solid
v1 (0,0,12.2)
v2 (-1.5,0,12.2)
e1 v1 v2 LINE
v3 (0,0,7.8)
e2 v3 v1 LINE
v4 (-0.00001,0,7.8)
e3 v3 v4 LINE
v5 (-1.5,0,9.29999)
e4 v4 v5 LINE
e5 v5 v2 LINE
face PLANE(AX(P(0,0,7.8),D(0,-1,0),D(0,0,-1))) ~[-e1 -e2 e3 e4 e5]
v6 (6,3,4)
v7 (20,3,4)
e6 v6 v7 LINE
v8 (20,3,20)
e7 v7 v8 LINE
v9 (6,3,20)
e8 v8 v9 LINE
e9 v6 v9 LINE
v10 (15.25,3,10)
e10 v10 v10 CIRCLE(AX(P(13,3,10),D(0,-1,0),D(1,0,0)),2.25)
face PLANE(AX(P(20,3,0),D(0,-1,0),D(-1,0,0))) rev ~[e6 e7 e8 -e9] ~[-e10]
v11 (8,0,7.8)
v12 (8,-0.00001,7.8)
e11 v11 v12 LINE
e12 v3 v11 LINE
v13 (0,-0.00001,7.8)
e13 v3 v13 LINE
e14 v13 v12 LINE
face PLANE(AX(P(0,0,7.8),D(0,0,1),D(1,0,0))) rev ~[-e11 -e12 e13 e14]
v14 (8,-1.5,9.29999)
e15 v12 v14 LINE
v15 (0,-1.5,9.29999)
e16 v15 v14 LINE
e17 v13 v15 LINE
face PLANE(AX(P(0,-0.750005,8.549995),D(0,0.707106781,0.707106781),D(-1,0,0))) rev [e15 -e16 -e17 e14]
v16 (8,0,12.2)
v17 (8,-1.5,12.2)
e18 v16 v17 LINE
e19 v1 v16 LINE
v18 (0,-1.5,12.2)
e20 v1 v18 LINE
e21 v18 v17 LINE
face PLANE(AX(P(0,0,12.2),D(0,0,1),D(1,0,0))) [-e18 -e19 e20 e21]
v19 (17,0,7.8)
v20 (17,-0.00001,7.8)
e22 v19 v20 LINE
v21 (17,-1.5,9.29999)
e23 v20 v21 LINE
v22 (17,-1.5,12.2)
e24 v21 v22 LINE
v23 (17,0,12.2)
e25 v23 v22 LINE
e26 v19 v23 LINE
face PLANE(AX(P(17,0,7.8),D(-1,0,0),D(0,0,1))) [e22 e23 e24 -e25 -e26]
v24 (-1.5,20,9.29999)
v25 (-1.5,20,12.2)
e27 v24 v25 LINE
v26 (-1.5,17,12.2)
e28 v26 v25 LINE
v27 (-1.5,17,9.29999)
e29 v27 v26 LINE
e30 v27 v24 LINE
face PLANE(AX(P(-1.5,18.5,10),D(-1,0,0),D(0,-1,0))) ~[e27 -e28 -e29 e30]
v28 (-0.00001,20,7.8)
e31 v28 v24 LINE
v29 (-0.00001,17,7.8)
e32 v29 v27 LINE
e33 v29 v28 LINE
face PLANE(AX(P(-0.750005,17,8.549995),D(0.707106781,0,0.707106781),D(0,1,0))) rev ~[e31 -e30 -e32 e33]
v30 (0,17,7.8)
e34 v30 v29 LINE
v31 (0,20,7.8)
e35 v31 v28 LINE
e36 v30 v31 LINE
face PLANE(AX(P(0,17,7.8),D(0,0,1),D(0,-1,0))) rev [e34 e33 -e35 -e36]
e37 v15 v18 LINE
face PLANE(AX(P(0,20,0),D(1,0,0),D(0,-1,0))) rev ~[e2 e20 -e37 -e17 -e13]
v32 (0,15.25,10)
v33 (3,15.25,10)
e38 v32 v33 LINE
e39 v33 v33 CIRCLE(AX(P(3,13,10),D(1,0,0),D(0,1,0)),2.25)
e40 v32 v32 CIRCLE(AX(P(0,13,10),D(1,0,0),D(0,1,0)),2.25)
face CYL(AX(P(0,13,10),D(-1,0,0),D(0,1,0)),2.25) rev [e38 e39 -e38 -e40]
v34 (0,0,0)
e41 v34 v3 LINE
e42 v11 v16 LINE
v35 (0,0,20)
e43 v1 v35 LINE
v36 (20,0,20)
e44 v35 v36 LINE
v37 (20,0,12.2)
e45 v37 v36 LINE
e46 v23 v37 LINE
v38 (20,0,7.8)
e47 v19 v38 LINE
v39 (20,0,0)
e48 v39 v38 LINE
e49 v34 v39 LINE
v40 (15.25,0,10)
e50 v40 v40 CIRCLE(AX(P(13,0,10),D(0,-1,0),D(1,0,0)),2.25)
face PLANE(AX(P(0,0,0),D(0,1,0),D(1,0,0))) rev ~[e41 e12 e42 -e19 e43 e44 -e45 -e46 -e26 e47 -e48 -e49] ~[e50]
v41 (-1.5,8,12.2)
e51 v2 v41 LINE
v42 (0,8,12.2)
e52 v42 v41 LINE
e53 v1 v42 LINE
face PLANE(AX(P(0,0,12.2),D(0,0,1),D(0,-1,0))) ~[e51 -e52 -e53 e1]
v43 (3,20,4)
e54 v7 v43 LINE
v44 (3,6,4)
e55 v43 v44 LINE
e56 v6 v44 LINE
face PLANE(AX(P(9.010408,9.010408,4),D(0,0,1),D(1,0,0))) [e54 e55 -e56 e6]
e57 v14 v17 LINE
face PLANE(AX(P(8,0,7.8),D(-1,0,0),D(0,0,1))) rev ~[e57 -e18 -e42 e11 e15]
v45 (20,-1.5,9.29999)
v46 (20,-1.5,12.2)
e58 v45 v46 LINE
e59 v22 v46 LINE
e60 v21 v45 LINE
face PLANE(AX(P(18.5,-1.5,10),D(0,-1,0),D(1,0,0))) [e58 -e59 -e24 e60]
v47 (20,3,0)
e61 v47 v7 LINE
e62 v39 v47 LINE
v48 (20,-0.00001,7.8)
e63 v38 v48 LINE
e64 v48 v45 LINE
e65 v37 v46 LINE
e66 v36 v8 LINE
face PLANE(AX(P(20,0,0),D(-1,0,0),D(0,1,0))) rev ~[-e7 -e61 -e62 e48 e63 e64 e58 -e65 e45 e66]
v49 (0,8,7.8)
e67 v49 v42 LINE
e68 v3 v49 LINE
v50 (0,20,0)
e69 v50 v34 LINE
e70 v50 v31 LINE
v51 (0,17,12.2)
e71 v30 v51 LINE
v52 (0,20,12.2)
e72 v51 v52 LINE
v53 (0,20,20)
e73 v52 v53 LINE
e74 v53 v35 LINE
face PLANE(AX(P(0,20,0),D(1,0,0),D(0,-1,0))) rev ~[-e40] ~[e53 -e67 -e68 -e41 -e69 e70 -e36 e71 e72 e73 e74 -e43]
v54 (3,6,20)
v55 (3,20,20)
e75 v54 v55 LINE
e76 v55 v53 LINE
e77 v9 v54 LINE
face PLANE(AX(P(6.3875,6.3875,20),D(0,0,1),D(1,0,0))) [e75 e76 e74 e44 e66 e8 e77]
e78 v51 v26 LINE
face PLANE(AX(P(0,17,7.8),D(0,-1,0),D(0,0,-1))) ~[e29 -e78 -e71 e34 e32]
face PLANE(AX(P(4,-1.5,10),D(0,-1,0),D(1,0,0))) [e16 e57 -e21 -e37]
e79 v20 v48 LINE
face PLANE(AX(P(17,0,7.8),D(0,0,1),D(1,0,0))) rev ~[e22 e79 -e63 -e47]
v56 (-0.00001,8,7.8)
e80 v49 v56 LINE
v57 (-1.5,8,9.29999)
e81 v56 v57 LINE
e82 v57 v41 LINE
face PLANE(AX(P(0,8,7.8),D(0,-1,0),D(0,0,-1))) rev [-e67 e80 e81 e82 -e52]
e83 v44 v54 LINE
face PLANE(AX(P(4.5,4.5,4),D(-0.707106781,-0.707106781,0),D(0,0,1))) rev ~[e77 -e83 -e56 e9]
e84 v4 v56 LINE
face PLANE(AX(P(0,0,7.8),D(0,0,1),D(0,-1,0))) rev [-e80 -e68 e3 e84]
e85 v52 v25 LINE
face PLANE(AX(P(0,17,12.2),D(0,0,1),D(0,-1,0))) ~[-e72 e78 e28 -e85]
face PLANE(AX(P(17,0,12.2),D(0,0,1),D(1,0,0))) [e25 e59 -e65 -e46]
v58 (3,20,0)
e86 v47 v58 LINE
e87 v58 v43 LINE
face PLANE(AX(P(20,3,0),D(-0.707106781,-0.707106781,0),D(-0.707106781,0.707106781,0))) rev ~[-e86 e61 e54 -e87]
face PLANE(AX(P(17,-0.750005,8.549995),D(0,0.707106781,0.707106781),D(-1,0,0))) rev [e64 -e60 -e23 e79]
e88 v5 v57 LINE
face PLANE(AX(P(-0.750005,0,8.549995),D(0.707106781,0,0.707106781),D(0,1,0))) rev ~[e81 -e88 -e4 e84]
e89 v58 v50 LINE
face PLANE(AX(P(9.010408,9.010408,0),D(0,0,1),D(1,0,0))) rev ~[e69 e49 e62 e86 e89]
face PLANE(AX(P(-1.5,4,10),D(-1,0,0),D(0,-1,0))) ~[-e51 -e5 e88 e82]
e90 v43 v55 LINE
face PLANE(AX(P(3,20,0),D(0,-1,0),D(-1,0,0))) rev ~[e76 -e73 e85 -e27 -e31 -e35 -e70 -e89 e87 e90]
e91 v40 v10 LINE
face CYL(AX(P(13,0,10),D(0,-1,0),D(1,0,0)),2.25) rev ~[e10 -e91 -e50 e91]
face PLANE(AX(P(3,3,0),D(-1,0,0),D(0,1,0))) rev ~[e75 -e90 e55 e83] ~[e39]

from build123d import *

# Parameters (mm, degrees)
F1_DEPTH = 20
F2_DEPTH = 4
F3_R     = 2.25
F4_DEPTH = 3
F3_W     = 8
F3_H     = 4.4
F3_W_2   = 3
F5_DEPTH = 1.5
F6_SIZE  = 1.49999
F8_SIZE  = 3


# Not quite as in the source:
# - a fillet or chamfer is up to 0.001 mm smaller than in the source, because OpenCascade refuses the exact size
# - a pattern or mirror of a feature is missing from the dataset's text; its kind, count and spacing are read off the source's solid


with BuildPart() as f1:
    # F0 (on Top) → F1 (new body)
    with BuildSketch(Plane.XY):
        Polygon((0, 20), (0, 0), (20, 0), (20, 3), (3, 3), (3, 20), align=None)
    extrude(amount=F1_DEPTH)

    # F0 (on Top) → F2 (join)
    with BuildSketch(Plane.XY):
        Polygon((3, 3), (20, 3), (3, 20), align=None)
    extrude(amount=F2_DEPTH)

    # F3 (on face) → F4 (cut, through all)
    with BuildSketch(Plane.XZ):
        with Locations((13, 10)):
            Circle(F3_R)
    f4 = extrude(amount=-F4_DEPTH, mode=Mode.SUBTRACT)

    # F4_copies: F4 across plane
    add(f4.mirror(Plane(origin=(0, 0, 0), x_dir=(-0.7071067812, -0.7071067812, 0), z_dir=(-0.7071067812, 0.7071067812, 0))), mode=Mode.SUBTRACT)

    # F3 (on face) → F5 (join)
    with BuildSketch(Plane.XZ):
        with Locations((4, 10)):
            Rectangle(F3_W, F3_H)
        with Locations((18.5, 10)):
            Rectangle(F3_W_2, F3_H)
    f5 = extrude(amount=F5_DEPTH)

    # F5_copies: F5 across plane
    add(f5.mirror(Plane(origin=(0, 0, 0), x_dir=(0.7071067812, 0.7071067812, 0), z_dir=(-0.7071067812, 0.7071067812, 0))))

    # F6 (size 1.5 in the source; OpenCascade refuses exactly that, so slightly less here)
    f6_edges = [f1.edges().sort_by_distance(p)[0] for p in [
        (4, -1.5, 7.8),
        (18.5, -1.5, 7.8),
        (-1.5, 4, 7.8),
        (-1.5, 18.5, 7.8),
    ]]
    chamfer(f6_edges, length=F6_SIZE)

    # F8
    f8_edges = [f1.edges().sort_by_distance(p)[0] for p in [
        (3, 3, 12),
    ]]
    chamfer(f8_edges, length=F8_SIZE)


solid = f1.part
